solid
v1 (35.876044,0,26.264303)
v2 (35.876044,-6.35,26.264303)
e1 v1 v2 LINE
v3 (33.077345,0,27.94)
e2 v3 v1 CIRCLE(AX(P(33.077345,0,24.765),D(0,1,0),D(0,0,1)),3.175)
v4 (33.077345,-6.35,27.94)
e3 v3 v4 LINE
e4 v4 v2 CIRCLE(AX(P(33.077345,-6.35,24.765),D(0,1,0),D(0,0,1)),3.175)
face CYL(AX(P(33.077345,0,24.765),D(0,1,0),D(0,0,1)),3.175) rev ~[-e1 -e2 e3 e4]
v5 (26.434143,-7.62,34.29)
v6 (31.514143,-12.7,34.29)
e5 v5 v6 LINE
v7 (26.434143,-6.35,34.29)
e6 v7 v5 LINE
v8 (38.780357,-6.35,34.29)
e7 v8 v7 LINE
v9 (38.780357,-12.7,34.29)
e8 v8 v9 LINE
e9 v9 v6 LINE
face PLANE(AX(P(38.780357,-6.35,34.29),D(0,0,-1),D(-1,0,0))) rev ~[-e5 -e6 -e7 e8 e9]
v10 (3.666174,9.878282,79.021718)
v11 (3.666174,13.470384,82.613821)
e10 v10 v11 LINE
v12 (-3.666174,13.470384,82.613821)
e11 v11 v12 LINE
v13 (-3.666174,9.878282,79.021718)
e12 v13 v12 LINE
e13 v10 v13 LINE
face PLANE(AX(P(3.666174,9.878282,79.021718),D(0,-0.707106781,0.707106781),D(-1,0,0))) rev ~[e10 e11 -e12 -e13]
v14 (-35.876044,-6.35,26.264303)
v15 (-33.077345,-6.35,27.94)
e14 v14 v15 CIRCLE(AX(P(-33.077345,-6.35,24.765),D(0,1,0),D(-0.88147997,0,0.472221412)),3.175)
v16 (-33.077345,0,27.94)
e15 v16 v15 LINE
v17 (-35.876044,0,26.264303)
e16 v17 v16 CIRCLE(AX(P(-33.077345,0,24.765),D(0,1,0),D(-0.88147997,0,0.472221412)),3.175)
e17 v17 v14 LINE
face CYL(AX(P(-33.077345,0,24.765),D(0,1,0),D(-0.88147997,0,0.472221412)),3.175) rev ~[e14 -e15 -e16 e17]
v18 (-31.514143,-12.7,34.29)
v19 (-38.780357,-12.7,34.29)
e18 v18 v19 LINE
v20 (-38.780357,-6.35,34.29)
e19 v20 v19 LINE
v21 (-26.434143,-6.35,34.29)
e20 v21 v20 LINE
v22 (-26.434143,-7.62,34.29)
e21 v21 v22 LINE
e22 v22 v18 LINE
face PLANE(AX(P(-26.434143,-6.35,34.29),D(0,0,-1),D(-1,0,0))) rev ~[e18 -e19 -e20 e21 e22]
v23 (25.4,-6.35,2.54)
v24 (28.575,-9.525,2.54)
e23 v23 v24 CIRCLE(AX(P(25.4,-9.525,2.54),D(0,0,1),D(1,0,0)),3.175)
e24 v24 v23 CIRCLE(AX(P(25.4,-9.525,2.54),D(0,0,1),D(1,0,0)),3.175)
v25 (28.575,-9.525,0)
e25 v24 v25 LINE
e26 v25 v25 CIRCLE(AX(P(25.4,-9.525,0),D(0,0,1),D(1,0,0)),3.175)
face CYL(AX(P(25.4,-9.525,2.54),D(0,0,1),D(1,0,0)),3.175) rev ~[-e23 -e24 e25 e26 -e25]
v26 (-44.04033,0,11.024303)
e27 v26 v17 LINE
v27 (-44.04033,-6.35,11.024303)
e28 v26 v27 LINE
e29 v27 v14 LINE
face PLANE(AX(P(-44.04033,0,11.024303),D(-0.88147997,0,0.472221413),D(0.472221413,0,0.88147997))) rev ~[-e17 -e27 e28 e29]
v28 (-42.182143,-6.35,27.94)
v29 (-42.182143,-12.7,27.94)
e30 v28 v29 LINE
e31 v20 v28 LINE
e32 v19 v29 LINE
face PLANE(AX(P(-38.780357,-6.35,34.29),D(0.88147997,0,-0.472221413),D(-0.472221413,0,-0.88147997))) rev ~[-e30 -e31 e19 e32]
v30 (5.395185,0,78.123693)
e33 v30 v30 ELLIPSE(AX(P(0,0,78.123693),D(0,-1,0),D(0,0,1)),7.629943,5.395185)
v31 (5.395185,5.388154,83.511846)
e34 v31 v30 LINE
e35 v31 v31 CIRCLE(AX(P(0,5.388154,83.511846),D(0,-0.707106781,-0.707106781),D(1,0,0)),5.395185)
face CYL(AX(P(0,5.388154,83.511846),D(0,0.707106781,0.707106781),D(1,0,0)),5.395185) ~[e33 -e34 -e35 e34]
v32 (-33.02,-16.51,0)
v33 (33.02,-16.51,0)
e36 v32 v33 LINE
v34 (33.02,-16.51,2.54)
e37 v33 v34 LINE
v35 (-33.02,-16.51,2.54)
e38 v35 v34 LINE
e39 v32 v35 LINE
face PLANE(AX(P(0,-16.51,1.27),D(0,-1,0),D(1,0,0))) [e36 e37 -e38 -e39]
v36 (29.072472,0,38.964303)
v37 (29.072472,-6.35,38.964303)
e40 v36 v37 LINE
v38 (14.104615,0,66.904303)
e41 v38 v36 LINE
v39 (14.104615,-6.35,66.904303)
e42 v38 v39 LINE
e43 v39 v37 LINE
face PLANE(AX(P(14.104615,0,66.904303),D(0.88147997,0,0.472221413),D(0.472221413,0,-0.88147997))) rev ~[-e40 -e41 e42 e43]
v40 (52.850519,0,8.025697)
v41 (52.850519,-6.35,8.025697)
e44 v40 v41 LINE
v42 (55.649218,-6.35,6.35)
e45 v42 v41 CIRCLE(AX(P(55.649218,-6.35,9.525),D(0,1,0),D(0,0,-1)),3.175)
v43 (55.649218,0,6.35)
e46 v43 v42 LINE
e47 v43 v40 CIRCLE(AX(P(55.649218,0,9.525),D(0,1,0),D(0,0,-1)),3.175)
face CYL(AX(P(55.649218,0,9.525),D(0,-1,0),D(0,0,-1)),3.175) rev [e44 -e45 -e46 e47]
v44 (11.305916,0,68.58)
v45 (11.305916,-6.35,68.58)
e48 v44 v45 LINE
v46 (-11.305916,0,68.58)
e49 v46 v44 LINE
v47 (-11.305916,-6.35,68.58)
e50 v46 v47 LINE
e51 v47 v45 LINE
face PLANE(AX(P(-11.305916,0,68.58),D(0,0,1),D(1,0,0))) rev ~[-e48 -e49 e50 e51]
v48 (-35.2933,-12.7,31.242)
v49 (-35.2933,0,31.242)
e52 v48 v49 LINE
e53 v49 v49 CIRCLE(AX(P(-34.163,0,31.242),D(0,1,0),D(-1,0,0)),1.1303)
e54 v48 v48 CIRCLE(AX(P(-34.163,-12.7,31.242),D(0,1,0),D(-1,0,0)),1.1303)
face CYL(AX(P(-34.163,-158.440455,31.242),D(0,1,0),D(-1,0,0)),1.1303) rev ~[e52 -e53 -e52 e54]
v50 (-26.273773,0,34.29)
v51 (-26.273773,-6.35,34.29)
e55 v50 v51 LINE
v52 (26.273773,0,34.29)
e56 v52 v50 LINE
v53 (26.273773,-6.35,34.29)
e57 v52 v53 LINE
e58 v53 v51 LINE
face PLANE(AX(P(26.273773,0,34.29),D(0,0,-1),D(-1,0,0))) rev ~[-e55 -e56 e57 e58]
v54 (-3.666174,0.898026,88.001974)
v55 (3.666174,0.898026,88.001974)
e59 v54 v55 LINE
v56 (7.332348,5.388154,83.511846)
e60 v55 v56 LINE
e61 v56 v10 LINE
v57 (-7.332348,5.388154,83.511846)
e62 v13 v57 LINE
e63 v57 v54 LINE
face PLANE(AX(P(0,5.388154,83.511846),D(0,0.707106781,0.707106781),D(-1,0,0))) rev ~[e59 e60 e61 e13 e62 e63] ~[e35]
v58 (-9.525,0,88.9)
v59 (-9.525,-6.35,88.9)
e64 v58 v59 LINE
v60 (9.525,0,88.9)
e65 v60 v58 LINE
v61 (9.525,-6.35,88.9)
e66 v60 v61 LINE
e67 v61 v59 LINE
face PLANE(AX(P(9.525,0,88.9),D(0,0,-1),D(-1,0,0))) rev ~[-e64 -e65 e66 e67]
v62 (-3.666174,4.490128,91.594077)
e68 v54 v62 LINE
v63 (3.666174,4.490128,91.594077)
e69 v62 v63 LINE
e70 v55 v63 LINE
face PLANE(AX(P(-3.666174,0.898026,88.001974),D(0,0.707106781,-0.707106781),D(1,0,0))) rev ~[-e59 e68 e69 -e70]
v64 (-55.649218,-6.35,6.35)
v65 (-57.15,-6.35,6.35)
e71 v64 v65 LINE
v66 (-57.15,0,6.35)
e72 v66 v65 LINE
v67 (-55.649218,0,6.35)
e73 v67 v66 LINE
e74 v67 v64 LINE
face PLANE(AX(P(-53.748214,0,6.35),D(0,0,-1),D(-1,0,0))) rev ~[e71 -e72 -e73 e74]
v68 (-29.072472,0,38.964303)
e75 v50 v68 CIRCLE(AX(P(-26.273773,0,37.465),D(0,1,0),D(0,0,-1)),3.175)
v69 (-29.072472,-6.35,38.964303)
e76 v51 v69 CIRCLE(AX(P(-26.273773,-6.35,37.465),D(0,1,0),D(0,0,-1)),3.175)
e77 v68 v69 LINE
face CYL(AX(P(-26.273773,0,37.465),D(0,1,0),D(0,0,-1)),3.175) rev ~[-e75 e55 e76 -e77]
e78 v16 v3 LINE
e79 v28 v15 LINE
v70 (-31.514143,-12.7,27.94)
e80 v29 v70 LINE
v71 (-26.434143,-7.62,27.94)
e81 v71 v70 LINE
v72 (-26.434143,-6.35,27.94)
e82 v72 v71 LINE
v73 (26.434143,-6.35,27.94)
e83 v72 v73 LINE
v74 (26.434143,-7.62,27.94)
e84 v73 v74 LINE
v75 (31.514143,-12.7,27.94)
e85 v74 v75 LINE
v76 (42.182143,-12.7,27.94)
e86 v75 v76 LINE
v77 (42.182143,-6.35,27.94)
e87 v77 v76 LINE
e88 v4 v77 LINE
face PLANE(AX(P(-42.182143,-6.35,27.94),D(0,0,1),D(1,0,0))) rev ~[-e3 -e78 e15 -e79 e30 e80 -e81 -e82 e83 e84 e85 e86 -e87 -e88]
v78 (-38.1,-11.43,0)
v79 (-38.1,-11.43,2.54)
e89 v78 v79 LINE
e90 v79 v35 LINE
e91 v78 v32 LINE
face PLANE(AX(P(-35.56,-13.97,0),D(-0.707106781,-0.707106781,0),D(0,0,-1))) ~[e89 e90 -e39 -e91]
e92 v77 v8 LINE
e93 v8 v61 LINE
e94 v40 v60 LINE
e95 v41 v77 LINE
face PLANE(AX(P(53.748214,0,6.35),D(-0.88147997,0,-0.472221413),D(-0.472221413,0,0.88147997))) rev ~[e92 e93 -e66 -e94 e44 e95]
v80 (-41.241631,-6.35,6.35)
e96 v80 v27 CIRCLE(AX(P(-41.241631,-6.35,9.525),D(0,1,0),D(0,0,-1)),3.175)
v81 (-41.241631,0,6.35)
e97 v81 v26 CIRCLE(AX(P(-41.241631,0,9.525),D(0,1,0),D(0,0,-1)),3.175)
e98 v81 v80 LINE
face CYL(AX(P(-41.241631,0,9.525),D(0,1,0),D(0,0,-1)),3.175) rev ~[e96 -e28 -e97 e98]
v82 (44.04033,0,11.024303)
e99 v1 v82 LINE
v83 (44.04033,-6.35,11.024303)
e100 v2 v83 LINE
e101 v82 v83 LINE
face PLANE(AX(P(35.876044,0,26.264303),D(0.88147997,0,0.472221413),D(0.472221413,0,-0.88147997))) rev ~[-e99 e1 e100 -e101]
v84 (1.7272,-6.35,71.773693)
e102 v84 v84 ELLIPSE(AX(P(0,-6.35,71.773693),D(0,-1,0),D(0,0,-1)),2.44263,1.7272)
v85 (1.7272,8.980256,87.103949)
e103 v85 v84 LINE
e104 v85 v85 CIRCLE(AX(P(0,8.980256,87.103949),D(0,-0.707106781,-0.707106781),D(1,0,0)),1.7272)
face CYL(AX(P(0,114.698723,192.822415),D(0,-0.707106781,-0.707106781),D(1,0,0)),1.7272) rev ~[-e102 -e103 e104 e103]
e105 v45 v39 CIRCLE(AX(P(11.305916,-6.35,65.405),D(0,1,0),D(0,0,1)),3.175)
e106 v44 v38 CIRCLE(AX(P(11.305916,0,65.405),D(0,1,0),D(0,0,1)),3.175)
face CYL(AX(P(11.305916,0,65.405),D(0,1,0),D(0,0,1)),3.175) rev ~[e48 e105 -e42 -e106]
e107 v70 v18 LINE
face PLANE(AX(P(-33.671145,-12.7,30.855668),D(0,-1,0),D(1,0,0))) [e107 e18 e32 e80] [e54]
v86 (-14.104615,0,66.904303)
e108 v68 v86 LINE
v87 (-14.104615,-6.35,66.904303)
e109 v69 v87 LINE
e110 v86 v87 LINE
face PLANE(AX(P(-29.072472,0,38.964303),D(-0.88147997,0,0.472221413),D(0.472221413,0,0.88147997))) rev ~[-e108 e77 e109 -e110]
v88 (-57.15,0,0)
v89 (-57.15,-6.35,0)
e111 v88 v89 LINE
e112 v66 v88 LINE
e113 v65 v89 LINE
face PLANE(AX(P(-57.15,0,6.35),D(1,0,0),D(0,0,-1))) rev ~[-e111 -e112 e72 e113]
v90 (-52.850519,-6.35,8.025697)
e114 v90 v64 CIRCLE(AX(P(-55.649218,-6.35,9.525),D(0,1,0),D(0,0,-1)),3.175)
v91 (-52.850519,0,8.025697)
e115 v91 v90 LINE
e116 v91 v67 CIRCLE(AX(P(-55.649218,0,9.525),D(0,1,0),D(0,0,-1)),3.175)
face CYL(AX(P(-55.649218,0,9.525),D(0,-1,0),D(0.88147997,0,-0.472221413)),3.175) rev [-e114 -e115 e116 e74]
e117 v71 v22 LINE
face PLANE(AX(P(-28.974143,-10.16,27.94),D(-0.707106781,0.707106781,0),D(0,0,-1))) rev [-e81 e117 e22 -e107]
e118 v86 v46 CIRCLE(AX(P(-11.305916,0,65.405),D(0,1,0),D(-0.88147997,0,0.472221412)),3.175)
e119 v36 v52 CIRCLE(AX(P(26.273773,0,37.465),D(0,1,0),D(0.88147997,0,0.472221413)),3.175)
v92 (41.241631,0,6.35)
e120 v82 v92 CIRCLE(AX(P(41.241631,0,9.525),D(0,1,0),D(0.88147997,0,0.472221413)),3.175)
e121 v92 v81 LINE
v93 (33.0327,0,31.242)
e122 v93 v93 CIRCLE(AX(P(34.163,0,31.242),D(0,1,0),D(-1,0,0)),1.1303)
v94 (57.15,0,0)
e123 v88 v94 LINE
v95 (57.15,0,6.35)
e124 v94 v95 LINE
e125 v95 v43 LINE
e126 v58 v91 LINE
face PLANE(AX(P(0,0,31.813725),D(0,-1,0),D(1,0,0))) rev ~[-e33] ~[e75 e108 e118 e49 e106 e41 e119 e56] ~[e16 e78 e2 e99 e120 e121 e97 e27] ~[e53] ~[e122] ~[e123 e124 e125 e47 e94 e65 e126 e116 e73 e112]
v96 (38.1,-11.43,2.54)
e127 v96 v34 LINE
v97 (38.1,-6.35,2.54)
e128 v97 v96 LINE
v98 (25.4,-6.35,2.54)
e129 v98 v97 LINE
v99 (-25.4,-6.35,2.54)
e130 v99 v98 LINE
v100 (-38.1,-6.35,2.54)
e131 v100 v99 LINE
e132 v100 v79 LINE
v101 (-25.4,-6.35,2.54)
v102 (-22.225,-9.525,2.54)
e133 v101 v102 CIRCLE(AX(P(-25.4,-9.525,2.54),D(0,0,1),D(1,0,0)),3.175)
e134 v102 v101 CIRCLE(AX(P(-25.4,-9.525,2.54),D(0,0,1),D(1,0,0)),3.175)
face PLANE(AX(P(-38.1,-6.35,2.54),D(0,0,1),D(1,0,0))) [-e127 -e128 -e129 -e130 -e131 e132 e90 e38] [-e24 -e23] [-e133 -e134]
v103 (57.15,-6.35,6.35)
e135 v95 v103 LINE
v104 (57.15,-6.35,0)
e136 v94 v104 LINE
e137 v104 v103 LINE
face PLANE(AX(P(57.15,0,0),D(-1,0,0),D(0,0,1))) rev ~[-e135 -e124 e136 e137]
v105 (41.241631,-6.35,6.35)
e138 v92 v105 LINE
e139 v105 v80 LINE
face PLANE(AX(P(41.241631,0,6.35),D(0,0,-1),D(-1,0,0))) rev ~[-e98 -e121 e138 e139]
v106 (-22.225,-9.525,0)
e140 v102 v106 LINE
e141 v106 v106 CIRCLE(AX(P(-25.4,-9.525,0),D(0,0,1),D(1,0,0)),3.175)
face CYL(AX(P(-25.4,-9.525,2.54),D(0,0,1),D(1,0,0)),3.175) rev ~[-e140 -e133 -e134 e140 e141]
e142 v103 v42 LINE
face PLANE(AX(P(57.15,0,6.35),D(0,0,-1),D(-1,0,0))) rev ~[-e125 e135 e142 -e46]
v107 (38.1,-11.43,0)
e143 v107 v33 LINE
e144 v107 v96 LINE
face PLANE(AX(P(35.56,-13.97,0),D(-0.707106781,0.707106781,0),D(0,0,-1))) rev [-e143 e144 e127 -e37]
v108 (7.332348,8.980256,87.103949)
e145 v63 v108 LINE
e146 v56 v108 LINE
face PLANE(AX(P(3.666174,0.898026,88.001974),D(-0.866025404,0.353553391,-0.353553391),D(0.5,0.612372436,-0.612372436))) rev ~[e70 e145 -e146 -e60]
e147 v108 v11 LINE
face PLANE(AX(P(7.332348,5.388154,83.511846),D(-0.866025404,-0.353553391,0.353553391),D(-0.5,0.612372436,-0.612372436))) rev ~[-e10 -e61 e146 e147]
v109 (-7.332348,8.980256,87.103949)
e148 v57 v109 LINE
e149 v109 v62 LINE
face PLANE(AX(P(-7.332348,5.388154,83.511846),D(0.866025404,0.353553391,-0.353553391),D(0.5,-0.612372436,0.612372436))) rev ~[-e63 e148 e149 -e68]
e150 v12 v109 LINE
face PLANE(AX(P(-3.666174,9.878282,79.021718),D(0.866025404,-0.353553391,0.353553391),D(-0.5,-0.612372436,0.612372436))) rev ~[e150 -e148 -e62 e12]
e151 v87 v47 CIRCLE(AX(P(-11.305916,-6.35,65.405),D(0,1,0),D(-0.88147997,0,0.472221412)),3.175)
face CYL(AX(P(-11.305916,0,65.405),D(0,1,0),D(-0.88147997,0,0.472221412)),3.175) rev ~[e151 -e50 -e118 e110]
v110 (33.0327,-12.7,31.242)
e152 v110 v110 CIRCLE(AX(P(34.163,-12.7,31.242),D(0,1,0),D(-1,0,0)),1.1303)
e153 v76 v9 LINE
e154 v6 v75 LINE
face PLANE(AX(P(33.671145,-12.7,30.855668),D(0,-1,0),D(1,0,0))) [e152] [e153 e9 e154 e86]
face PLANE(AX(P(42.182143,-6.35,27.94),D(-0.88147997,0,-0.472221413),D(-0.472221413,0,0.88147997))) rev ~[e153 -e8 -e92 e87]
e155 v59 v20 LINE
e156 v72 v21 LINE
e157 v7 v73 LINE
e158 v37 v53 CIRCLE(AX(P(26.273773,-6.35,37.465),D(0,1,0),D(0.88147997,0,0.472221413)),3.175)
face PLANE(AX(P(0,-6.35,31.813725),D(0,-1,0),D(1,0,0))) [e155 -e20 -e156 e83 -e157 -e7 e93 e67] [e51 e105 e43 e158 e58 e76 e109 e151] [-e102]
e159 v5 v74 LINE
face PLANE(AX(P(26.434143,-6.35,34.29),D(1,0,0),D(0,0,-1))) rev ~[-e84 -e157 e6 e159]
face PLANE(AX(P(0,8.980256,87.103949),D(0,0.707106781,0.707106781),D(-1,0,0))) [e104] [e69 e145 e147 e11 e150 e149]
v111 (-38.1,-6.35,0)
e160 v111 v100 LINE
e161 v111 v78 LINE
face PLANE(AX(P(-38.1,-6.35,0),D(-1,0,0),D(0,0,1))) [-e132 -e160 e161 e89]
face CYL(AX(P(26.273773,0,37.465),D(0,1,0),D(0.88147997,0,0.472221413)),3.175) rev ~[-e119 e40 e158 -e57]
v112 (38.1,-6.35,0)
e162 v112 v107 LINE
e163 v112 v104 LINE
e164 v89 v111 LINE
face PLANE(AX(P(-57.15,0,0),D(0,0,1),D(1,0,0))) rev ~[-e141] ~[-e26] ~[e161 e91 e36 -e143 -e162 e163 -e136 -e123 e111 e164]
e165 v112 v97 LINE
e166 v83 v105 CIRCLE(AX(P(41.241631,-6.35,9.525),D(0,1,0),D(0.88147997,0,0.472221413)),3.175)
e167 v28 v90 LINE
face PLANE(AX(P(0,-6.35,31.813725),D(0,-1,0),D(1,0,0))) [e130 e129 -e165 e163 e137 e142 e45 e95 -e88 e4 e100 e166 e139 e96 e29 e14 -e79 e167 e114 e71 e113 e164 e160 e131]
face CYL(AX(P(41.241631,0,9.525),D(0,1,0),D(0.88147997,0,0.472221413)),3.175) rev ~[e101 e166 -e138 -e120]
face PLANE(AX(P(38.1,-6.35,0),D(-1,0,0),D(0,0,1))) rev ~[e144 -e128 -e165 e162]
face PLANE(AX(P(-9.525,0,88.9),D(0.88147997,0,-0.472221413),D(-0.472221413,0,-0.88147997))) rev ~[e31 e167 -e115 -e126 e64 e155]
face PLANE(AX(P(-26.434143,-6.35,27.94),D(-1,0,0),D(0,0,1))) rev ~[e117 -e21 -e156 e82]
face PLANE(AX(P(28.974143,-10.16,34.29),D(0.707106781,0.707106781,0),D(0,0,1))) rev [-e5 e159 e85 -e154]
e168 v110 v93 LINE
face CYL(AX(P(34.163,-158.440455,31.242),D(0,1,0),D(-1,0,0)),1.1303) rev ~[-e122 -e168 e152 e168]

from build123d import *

# Parameters (mm, degrees)
F1_DEPTH  = 6.35
F2_R      = 3.175
F3_W      = 76.2
F3_H      = 2.54
F4_DEPTH  = 10.16
F5_SIZE   = 5.08
F7_DEPTH  = 6.35
F8_SIZE   = 5.08
F10_D     = 2.2606
F13_DEPTH = 5.08
F14_R     = 5.3951847675
F15_REACH = 89.7970127444
F17_D     = 3.4544
F19_D     = 6.35
F19_DEPTH = 2.541


with BuildPart() as f1:
    # F0 (on Front) → F1 (new body)
    with BuildSketch(Plane.XZ):
        Polygon((9.525, 88.9), (-9.525, 88.9), (-53.7482142857, 6.35), (-57.15, 0), (57.15, 0), (53.7482142857, 6.35), align=None)
        with BuildLine():
            Line((41.2416306314, 6.35), (-41.2416306314, 6.35))
            ThreePointArc((-41.2416306314, 6.35), (-43.9656820238, 7.8939975439), (-44.0403295363, 11.0243029847))
            Line((-44.0403295363, 11.0243029847), (-35.876043822, 26.2643029847))
            ThreePointArc((-35.876043822, 26.2643029847), (-34.7083473732, 27.4890513924), (-33.0773449171, 27.94))
            Line((-33.0773449171, 27.94), (33.0773449171, 27.94))
            ThreePointArc((33.0773449171, 27.94), (34.7083473732, 27.4890513924), (35.876043822, 26.2643029847))
            Line((35.876043822, 26.2643029847), (44.0403295363, 11.0243029847))
            ThreePointArc((44.0403295363, 11.0243029847), (43.9656820238, 7.8939975439), (41.2416306314, 6.35))
        make_face(mode=Mode.SUBTRACT)
        with BuildLine():
            ThreePointArc((-14.1046152506, 66.9043029847), (-12.9369188018, 68.1290513924), (-11.3059163457, 68.58))
            Line((-11.3059163457, 68.58), (11.3059163457, 68.58))
            ThreePointArc((11.3059163457, 68.58), (12.9369188018, 68.1290513924), (14.1046152506, 66.9043029847))
            Line((14.1046152506, 66.9043029847), (29.0724723934, 38.9643029847))
            ThreePointArc((29.0724723934, 38.9643029847), (28.9978248809, 35.8339975439), (26.2737734886, 34.29))
            Line((26.2737734886, 34.29), (-26.2737734886, 34.29))
            ThreePointArc((-26.2737734886, 34.29), (-28.9978248809, 35.8339975439), (-29.0724723934, 38.9643029847))
            Line((-29.0724723934, 38.9643029847), (-14.1046152506, 66.9043029847))
        make_face(mode=Mode.SUBTRACT)
        Polygon((-57.15, 0), (-53.7482142857, 6.35), (-57.15, 6.35), align=None)
        Polygon((57.15, 6.35), (53.7482142857, 6.35), (57.15, 0), align=None)
    extrude(amount=F1_DEPTH)

    # F2
    f2_edges = [f1.edges().sort_by_distance(p)[0] for p in [
        (53.748214, -3.175, 6.35),
        (-53.748214, -3.175, 6.35),
    ]]
    fillet(f2_edges, radius=F2_R)

    # F3 (on face) → F4 (join)
    with BuildSketch(Plane.XZ.offset(6.35)):
        with Locations((0, 1.27)):
            Rectangle(F3_W, F3_H)
    extrude(amount=F4_DEPTH)

    # F5
    f5_edges = [f1.edges().sort_by_distance(p)[0] for p in [
        (-38.1, -16.51, 1.27),
        (38.1, -16.51, 1.27),
    ]]
    chamfer(f5_edges, length=F5_SIZE)

    # F6 (on face) → F7 (join)
    with BuildSketch(Plane.XZ.offset(6.35)):
        Polygon((-42.1821428571, 27.94), (-33.0773449171, 27.94), (-26.4341428571, 27.94), (-26.4341428571, 34.29), (-38.7803571429, 34.29), align=None)
        Polygon((26.4341428571, 34.29), (26.4341428571, 27.94), (33.0773449171, 27.94), (42.1821428571, 27.94), (38.7803571429, 34.29), align=None)
    extrude(amount=F7_DEPTH)

    # F8
    f8_edges = [f1.edges().sort_by_distance(p)[0] for p in [
        (26.434143, -12.7, 31.115),
        (-26.434143, -12.7, 31.115),
    ]]
    chamfer(f8_edges, length=F8_SIZE)

    # F10 (through all)
    with Locations(Plane.XZ.offset(12.7)):
        with Locations((-34.163, 31.242), (34.163, 31.242)):
            Hole(F10_D / 2)



with BuildPart() as f13:
    # F12 (on face) → F13 (new body)
    with BuildSketch(Plane(origin=(0, 44.45, 44.45), x_dir=(-1, 0, 0), z_dir=(0, 0.7071067812, 0.7071067812))):
        Polygon((-3.6661742094, 48.8917928475), (3.6661742094, 48.8917928475), (7.3323484187, 55.2417928475), (3.6661742094, 61.5917928475), (-3.6661742094, 61.5917928475), (-7.3323484187, 55.2417928475), align=None)
    extrude(amount=F13_DEPTH)


with BuildPart() as f1_1:
    add(f1.part)

    add(f13.part)  # F15 merges F13
    f15_end = f1_1.faces().sort_by_distance((-29.9113566426, 0, 47.7790611404))[0]
    # F14 (on face) → F15 (join, up to a face of the model that its end follows)
    with BuildSketch(Plane(origin=(0, 44.45, 44.45), x_dir=(1, 0, 0), z_dir=(0, -0.7071067812, -0.7071067812))):
        with Locations((0, 55.2417928475)):
            Circle(F14_R)
    f15_long = extrude(amount=F15_REACH, mode=Mode.PRIVATE)
    add(split(f15_long, bisect_by=f15_end, keep=Keep.TOP, mode=Mode.PRIVATE))

    # F17 (through all)
    with Locations(Plane(origin=(0, 48.0421024484, 48.0421024484), x_dir=(-1, 0, 0), z_dir=(0, 0.7071067812, 0.7071067812))):
        with Locations((0, 55.2417928475)):
            Hole(F17_D / 2)

    # F19 (through all, one way)
    with BuildSketch(Plane.XY.offset(2.54)):
        with Locations((-25.4, -9.525), (25.4, -9.525)):
            Circle(F19_D / 2)
    extrude(amount=-F19_DEPTH, mode=Mode.SUBTRACT)


solid = f1_1.part
